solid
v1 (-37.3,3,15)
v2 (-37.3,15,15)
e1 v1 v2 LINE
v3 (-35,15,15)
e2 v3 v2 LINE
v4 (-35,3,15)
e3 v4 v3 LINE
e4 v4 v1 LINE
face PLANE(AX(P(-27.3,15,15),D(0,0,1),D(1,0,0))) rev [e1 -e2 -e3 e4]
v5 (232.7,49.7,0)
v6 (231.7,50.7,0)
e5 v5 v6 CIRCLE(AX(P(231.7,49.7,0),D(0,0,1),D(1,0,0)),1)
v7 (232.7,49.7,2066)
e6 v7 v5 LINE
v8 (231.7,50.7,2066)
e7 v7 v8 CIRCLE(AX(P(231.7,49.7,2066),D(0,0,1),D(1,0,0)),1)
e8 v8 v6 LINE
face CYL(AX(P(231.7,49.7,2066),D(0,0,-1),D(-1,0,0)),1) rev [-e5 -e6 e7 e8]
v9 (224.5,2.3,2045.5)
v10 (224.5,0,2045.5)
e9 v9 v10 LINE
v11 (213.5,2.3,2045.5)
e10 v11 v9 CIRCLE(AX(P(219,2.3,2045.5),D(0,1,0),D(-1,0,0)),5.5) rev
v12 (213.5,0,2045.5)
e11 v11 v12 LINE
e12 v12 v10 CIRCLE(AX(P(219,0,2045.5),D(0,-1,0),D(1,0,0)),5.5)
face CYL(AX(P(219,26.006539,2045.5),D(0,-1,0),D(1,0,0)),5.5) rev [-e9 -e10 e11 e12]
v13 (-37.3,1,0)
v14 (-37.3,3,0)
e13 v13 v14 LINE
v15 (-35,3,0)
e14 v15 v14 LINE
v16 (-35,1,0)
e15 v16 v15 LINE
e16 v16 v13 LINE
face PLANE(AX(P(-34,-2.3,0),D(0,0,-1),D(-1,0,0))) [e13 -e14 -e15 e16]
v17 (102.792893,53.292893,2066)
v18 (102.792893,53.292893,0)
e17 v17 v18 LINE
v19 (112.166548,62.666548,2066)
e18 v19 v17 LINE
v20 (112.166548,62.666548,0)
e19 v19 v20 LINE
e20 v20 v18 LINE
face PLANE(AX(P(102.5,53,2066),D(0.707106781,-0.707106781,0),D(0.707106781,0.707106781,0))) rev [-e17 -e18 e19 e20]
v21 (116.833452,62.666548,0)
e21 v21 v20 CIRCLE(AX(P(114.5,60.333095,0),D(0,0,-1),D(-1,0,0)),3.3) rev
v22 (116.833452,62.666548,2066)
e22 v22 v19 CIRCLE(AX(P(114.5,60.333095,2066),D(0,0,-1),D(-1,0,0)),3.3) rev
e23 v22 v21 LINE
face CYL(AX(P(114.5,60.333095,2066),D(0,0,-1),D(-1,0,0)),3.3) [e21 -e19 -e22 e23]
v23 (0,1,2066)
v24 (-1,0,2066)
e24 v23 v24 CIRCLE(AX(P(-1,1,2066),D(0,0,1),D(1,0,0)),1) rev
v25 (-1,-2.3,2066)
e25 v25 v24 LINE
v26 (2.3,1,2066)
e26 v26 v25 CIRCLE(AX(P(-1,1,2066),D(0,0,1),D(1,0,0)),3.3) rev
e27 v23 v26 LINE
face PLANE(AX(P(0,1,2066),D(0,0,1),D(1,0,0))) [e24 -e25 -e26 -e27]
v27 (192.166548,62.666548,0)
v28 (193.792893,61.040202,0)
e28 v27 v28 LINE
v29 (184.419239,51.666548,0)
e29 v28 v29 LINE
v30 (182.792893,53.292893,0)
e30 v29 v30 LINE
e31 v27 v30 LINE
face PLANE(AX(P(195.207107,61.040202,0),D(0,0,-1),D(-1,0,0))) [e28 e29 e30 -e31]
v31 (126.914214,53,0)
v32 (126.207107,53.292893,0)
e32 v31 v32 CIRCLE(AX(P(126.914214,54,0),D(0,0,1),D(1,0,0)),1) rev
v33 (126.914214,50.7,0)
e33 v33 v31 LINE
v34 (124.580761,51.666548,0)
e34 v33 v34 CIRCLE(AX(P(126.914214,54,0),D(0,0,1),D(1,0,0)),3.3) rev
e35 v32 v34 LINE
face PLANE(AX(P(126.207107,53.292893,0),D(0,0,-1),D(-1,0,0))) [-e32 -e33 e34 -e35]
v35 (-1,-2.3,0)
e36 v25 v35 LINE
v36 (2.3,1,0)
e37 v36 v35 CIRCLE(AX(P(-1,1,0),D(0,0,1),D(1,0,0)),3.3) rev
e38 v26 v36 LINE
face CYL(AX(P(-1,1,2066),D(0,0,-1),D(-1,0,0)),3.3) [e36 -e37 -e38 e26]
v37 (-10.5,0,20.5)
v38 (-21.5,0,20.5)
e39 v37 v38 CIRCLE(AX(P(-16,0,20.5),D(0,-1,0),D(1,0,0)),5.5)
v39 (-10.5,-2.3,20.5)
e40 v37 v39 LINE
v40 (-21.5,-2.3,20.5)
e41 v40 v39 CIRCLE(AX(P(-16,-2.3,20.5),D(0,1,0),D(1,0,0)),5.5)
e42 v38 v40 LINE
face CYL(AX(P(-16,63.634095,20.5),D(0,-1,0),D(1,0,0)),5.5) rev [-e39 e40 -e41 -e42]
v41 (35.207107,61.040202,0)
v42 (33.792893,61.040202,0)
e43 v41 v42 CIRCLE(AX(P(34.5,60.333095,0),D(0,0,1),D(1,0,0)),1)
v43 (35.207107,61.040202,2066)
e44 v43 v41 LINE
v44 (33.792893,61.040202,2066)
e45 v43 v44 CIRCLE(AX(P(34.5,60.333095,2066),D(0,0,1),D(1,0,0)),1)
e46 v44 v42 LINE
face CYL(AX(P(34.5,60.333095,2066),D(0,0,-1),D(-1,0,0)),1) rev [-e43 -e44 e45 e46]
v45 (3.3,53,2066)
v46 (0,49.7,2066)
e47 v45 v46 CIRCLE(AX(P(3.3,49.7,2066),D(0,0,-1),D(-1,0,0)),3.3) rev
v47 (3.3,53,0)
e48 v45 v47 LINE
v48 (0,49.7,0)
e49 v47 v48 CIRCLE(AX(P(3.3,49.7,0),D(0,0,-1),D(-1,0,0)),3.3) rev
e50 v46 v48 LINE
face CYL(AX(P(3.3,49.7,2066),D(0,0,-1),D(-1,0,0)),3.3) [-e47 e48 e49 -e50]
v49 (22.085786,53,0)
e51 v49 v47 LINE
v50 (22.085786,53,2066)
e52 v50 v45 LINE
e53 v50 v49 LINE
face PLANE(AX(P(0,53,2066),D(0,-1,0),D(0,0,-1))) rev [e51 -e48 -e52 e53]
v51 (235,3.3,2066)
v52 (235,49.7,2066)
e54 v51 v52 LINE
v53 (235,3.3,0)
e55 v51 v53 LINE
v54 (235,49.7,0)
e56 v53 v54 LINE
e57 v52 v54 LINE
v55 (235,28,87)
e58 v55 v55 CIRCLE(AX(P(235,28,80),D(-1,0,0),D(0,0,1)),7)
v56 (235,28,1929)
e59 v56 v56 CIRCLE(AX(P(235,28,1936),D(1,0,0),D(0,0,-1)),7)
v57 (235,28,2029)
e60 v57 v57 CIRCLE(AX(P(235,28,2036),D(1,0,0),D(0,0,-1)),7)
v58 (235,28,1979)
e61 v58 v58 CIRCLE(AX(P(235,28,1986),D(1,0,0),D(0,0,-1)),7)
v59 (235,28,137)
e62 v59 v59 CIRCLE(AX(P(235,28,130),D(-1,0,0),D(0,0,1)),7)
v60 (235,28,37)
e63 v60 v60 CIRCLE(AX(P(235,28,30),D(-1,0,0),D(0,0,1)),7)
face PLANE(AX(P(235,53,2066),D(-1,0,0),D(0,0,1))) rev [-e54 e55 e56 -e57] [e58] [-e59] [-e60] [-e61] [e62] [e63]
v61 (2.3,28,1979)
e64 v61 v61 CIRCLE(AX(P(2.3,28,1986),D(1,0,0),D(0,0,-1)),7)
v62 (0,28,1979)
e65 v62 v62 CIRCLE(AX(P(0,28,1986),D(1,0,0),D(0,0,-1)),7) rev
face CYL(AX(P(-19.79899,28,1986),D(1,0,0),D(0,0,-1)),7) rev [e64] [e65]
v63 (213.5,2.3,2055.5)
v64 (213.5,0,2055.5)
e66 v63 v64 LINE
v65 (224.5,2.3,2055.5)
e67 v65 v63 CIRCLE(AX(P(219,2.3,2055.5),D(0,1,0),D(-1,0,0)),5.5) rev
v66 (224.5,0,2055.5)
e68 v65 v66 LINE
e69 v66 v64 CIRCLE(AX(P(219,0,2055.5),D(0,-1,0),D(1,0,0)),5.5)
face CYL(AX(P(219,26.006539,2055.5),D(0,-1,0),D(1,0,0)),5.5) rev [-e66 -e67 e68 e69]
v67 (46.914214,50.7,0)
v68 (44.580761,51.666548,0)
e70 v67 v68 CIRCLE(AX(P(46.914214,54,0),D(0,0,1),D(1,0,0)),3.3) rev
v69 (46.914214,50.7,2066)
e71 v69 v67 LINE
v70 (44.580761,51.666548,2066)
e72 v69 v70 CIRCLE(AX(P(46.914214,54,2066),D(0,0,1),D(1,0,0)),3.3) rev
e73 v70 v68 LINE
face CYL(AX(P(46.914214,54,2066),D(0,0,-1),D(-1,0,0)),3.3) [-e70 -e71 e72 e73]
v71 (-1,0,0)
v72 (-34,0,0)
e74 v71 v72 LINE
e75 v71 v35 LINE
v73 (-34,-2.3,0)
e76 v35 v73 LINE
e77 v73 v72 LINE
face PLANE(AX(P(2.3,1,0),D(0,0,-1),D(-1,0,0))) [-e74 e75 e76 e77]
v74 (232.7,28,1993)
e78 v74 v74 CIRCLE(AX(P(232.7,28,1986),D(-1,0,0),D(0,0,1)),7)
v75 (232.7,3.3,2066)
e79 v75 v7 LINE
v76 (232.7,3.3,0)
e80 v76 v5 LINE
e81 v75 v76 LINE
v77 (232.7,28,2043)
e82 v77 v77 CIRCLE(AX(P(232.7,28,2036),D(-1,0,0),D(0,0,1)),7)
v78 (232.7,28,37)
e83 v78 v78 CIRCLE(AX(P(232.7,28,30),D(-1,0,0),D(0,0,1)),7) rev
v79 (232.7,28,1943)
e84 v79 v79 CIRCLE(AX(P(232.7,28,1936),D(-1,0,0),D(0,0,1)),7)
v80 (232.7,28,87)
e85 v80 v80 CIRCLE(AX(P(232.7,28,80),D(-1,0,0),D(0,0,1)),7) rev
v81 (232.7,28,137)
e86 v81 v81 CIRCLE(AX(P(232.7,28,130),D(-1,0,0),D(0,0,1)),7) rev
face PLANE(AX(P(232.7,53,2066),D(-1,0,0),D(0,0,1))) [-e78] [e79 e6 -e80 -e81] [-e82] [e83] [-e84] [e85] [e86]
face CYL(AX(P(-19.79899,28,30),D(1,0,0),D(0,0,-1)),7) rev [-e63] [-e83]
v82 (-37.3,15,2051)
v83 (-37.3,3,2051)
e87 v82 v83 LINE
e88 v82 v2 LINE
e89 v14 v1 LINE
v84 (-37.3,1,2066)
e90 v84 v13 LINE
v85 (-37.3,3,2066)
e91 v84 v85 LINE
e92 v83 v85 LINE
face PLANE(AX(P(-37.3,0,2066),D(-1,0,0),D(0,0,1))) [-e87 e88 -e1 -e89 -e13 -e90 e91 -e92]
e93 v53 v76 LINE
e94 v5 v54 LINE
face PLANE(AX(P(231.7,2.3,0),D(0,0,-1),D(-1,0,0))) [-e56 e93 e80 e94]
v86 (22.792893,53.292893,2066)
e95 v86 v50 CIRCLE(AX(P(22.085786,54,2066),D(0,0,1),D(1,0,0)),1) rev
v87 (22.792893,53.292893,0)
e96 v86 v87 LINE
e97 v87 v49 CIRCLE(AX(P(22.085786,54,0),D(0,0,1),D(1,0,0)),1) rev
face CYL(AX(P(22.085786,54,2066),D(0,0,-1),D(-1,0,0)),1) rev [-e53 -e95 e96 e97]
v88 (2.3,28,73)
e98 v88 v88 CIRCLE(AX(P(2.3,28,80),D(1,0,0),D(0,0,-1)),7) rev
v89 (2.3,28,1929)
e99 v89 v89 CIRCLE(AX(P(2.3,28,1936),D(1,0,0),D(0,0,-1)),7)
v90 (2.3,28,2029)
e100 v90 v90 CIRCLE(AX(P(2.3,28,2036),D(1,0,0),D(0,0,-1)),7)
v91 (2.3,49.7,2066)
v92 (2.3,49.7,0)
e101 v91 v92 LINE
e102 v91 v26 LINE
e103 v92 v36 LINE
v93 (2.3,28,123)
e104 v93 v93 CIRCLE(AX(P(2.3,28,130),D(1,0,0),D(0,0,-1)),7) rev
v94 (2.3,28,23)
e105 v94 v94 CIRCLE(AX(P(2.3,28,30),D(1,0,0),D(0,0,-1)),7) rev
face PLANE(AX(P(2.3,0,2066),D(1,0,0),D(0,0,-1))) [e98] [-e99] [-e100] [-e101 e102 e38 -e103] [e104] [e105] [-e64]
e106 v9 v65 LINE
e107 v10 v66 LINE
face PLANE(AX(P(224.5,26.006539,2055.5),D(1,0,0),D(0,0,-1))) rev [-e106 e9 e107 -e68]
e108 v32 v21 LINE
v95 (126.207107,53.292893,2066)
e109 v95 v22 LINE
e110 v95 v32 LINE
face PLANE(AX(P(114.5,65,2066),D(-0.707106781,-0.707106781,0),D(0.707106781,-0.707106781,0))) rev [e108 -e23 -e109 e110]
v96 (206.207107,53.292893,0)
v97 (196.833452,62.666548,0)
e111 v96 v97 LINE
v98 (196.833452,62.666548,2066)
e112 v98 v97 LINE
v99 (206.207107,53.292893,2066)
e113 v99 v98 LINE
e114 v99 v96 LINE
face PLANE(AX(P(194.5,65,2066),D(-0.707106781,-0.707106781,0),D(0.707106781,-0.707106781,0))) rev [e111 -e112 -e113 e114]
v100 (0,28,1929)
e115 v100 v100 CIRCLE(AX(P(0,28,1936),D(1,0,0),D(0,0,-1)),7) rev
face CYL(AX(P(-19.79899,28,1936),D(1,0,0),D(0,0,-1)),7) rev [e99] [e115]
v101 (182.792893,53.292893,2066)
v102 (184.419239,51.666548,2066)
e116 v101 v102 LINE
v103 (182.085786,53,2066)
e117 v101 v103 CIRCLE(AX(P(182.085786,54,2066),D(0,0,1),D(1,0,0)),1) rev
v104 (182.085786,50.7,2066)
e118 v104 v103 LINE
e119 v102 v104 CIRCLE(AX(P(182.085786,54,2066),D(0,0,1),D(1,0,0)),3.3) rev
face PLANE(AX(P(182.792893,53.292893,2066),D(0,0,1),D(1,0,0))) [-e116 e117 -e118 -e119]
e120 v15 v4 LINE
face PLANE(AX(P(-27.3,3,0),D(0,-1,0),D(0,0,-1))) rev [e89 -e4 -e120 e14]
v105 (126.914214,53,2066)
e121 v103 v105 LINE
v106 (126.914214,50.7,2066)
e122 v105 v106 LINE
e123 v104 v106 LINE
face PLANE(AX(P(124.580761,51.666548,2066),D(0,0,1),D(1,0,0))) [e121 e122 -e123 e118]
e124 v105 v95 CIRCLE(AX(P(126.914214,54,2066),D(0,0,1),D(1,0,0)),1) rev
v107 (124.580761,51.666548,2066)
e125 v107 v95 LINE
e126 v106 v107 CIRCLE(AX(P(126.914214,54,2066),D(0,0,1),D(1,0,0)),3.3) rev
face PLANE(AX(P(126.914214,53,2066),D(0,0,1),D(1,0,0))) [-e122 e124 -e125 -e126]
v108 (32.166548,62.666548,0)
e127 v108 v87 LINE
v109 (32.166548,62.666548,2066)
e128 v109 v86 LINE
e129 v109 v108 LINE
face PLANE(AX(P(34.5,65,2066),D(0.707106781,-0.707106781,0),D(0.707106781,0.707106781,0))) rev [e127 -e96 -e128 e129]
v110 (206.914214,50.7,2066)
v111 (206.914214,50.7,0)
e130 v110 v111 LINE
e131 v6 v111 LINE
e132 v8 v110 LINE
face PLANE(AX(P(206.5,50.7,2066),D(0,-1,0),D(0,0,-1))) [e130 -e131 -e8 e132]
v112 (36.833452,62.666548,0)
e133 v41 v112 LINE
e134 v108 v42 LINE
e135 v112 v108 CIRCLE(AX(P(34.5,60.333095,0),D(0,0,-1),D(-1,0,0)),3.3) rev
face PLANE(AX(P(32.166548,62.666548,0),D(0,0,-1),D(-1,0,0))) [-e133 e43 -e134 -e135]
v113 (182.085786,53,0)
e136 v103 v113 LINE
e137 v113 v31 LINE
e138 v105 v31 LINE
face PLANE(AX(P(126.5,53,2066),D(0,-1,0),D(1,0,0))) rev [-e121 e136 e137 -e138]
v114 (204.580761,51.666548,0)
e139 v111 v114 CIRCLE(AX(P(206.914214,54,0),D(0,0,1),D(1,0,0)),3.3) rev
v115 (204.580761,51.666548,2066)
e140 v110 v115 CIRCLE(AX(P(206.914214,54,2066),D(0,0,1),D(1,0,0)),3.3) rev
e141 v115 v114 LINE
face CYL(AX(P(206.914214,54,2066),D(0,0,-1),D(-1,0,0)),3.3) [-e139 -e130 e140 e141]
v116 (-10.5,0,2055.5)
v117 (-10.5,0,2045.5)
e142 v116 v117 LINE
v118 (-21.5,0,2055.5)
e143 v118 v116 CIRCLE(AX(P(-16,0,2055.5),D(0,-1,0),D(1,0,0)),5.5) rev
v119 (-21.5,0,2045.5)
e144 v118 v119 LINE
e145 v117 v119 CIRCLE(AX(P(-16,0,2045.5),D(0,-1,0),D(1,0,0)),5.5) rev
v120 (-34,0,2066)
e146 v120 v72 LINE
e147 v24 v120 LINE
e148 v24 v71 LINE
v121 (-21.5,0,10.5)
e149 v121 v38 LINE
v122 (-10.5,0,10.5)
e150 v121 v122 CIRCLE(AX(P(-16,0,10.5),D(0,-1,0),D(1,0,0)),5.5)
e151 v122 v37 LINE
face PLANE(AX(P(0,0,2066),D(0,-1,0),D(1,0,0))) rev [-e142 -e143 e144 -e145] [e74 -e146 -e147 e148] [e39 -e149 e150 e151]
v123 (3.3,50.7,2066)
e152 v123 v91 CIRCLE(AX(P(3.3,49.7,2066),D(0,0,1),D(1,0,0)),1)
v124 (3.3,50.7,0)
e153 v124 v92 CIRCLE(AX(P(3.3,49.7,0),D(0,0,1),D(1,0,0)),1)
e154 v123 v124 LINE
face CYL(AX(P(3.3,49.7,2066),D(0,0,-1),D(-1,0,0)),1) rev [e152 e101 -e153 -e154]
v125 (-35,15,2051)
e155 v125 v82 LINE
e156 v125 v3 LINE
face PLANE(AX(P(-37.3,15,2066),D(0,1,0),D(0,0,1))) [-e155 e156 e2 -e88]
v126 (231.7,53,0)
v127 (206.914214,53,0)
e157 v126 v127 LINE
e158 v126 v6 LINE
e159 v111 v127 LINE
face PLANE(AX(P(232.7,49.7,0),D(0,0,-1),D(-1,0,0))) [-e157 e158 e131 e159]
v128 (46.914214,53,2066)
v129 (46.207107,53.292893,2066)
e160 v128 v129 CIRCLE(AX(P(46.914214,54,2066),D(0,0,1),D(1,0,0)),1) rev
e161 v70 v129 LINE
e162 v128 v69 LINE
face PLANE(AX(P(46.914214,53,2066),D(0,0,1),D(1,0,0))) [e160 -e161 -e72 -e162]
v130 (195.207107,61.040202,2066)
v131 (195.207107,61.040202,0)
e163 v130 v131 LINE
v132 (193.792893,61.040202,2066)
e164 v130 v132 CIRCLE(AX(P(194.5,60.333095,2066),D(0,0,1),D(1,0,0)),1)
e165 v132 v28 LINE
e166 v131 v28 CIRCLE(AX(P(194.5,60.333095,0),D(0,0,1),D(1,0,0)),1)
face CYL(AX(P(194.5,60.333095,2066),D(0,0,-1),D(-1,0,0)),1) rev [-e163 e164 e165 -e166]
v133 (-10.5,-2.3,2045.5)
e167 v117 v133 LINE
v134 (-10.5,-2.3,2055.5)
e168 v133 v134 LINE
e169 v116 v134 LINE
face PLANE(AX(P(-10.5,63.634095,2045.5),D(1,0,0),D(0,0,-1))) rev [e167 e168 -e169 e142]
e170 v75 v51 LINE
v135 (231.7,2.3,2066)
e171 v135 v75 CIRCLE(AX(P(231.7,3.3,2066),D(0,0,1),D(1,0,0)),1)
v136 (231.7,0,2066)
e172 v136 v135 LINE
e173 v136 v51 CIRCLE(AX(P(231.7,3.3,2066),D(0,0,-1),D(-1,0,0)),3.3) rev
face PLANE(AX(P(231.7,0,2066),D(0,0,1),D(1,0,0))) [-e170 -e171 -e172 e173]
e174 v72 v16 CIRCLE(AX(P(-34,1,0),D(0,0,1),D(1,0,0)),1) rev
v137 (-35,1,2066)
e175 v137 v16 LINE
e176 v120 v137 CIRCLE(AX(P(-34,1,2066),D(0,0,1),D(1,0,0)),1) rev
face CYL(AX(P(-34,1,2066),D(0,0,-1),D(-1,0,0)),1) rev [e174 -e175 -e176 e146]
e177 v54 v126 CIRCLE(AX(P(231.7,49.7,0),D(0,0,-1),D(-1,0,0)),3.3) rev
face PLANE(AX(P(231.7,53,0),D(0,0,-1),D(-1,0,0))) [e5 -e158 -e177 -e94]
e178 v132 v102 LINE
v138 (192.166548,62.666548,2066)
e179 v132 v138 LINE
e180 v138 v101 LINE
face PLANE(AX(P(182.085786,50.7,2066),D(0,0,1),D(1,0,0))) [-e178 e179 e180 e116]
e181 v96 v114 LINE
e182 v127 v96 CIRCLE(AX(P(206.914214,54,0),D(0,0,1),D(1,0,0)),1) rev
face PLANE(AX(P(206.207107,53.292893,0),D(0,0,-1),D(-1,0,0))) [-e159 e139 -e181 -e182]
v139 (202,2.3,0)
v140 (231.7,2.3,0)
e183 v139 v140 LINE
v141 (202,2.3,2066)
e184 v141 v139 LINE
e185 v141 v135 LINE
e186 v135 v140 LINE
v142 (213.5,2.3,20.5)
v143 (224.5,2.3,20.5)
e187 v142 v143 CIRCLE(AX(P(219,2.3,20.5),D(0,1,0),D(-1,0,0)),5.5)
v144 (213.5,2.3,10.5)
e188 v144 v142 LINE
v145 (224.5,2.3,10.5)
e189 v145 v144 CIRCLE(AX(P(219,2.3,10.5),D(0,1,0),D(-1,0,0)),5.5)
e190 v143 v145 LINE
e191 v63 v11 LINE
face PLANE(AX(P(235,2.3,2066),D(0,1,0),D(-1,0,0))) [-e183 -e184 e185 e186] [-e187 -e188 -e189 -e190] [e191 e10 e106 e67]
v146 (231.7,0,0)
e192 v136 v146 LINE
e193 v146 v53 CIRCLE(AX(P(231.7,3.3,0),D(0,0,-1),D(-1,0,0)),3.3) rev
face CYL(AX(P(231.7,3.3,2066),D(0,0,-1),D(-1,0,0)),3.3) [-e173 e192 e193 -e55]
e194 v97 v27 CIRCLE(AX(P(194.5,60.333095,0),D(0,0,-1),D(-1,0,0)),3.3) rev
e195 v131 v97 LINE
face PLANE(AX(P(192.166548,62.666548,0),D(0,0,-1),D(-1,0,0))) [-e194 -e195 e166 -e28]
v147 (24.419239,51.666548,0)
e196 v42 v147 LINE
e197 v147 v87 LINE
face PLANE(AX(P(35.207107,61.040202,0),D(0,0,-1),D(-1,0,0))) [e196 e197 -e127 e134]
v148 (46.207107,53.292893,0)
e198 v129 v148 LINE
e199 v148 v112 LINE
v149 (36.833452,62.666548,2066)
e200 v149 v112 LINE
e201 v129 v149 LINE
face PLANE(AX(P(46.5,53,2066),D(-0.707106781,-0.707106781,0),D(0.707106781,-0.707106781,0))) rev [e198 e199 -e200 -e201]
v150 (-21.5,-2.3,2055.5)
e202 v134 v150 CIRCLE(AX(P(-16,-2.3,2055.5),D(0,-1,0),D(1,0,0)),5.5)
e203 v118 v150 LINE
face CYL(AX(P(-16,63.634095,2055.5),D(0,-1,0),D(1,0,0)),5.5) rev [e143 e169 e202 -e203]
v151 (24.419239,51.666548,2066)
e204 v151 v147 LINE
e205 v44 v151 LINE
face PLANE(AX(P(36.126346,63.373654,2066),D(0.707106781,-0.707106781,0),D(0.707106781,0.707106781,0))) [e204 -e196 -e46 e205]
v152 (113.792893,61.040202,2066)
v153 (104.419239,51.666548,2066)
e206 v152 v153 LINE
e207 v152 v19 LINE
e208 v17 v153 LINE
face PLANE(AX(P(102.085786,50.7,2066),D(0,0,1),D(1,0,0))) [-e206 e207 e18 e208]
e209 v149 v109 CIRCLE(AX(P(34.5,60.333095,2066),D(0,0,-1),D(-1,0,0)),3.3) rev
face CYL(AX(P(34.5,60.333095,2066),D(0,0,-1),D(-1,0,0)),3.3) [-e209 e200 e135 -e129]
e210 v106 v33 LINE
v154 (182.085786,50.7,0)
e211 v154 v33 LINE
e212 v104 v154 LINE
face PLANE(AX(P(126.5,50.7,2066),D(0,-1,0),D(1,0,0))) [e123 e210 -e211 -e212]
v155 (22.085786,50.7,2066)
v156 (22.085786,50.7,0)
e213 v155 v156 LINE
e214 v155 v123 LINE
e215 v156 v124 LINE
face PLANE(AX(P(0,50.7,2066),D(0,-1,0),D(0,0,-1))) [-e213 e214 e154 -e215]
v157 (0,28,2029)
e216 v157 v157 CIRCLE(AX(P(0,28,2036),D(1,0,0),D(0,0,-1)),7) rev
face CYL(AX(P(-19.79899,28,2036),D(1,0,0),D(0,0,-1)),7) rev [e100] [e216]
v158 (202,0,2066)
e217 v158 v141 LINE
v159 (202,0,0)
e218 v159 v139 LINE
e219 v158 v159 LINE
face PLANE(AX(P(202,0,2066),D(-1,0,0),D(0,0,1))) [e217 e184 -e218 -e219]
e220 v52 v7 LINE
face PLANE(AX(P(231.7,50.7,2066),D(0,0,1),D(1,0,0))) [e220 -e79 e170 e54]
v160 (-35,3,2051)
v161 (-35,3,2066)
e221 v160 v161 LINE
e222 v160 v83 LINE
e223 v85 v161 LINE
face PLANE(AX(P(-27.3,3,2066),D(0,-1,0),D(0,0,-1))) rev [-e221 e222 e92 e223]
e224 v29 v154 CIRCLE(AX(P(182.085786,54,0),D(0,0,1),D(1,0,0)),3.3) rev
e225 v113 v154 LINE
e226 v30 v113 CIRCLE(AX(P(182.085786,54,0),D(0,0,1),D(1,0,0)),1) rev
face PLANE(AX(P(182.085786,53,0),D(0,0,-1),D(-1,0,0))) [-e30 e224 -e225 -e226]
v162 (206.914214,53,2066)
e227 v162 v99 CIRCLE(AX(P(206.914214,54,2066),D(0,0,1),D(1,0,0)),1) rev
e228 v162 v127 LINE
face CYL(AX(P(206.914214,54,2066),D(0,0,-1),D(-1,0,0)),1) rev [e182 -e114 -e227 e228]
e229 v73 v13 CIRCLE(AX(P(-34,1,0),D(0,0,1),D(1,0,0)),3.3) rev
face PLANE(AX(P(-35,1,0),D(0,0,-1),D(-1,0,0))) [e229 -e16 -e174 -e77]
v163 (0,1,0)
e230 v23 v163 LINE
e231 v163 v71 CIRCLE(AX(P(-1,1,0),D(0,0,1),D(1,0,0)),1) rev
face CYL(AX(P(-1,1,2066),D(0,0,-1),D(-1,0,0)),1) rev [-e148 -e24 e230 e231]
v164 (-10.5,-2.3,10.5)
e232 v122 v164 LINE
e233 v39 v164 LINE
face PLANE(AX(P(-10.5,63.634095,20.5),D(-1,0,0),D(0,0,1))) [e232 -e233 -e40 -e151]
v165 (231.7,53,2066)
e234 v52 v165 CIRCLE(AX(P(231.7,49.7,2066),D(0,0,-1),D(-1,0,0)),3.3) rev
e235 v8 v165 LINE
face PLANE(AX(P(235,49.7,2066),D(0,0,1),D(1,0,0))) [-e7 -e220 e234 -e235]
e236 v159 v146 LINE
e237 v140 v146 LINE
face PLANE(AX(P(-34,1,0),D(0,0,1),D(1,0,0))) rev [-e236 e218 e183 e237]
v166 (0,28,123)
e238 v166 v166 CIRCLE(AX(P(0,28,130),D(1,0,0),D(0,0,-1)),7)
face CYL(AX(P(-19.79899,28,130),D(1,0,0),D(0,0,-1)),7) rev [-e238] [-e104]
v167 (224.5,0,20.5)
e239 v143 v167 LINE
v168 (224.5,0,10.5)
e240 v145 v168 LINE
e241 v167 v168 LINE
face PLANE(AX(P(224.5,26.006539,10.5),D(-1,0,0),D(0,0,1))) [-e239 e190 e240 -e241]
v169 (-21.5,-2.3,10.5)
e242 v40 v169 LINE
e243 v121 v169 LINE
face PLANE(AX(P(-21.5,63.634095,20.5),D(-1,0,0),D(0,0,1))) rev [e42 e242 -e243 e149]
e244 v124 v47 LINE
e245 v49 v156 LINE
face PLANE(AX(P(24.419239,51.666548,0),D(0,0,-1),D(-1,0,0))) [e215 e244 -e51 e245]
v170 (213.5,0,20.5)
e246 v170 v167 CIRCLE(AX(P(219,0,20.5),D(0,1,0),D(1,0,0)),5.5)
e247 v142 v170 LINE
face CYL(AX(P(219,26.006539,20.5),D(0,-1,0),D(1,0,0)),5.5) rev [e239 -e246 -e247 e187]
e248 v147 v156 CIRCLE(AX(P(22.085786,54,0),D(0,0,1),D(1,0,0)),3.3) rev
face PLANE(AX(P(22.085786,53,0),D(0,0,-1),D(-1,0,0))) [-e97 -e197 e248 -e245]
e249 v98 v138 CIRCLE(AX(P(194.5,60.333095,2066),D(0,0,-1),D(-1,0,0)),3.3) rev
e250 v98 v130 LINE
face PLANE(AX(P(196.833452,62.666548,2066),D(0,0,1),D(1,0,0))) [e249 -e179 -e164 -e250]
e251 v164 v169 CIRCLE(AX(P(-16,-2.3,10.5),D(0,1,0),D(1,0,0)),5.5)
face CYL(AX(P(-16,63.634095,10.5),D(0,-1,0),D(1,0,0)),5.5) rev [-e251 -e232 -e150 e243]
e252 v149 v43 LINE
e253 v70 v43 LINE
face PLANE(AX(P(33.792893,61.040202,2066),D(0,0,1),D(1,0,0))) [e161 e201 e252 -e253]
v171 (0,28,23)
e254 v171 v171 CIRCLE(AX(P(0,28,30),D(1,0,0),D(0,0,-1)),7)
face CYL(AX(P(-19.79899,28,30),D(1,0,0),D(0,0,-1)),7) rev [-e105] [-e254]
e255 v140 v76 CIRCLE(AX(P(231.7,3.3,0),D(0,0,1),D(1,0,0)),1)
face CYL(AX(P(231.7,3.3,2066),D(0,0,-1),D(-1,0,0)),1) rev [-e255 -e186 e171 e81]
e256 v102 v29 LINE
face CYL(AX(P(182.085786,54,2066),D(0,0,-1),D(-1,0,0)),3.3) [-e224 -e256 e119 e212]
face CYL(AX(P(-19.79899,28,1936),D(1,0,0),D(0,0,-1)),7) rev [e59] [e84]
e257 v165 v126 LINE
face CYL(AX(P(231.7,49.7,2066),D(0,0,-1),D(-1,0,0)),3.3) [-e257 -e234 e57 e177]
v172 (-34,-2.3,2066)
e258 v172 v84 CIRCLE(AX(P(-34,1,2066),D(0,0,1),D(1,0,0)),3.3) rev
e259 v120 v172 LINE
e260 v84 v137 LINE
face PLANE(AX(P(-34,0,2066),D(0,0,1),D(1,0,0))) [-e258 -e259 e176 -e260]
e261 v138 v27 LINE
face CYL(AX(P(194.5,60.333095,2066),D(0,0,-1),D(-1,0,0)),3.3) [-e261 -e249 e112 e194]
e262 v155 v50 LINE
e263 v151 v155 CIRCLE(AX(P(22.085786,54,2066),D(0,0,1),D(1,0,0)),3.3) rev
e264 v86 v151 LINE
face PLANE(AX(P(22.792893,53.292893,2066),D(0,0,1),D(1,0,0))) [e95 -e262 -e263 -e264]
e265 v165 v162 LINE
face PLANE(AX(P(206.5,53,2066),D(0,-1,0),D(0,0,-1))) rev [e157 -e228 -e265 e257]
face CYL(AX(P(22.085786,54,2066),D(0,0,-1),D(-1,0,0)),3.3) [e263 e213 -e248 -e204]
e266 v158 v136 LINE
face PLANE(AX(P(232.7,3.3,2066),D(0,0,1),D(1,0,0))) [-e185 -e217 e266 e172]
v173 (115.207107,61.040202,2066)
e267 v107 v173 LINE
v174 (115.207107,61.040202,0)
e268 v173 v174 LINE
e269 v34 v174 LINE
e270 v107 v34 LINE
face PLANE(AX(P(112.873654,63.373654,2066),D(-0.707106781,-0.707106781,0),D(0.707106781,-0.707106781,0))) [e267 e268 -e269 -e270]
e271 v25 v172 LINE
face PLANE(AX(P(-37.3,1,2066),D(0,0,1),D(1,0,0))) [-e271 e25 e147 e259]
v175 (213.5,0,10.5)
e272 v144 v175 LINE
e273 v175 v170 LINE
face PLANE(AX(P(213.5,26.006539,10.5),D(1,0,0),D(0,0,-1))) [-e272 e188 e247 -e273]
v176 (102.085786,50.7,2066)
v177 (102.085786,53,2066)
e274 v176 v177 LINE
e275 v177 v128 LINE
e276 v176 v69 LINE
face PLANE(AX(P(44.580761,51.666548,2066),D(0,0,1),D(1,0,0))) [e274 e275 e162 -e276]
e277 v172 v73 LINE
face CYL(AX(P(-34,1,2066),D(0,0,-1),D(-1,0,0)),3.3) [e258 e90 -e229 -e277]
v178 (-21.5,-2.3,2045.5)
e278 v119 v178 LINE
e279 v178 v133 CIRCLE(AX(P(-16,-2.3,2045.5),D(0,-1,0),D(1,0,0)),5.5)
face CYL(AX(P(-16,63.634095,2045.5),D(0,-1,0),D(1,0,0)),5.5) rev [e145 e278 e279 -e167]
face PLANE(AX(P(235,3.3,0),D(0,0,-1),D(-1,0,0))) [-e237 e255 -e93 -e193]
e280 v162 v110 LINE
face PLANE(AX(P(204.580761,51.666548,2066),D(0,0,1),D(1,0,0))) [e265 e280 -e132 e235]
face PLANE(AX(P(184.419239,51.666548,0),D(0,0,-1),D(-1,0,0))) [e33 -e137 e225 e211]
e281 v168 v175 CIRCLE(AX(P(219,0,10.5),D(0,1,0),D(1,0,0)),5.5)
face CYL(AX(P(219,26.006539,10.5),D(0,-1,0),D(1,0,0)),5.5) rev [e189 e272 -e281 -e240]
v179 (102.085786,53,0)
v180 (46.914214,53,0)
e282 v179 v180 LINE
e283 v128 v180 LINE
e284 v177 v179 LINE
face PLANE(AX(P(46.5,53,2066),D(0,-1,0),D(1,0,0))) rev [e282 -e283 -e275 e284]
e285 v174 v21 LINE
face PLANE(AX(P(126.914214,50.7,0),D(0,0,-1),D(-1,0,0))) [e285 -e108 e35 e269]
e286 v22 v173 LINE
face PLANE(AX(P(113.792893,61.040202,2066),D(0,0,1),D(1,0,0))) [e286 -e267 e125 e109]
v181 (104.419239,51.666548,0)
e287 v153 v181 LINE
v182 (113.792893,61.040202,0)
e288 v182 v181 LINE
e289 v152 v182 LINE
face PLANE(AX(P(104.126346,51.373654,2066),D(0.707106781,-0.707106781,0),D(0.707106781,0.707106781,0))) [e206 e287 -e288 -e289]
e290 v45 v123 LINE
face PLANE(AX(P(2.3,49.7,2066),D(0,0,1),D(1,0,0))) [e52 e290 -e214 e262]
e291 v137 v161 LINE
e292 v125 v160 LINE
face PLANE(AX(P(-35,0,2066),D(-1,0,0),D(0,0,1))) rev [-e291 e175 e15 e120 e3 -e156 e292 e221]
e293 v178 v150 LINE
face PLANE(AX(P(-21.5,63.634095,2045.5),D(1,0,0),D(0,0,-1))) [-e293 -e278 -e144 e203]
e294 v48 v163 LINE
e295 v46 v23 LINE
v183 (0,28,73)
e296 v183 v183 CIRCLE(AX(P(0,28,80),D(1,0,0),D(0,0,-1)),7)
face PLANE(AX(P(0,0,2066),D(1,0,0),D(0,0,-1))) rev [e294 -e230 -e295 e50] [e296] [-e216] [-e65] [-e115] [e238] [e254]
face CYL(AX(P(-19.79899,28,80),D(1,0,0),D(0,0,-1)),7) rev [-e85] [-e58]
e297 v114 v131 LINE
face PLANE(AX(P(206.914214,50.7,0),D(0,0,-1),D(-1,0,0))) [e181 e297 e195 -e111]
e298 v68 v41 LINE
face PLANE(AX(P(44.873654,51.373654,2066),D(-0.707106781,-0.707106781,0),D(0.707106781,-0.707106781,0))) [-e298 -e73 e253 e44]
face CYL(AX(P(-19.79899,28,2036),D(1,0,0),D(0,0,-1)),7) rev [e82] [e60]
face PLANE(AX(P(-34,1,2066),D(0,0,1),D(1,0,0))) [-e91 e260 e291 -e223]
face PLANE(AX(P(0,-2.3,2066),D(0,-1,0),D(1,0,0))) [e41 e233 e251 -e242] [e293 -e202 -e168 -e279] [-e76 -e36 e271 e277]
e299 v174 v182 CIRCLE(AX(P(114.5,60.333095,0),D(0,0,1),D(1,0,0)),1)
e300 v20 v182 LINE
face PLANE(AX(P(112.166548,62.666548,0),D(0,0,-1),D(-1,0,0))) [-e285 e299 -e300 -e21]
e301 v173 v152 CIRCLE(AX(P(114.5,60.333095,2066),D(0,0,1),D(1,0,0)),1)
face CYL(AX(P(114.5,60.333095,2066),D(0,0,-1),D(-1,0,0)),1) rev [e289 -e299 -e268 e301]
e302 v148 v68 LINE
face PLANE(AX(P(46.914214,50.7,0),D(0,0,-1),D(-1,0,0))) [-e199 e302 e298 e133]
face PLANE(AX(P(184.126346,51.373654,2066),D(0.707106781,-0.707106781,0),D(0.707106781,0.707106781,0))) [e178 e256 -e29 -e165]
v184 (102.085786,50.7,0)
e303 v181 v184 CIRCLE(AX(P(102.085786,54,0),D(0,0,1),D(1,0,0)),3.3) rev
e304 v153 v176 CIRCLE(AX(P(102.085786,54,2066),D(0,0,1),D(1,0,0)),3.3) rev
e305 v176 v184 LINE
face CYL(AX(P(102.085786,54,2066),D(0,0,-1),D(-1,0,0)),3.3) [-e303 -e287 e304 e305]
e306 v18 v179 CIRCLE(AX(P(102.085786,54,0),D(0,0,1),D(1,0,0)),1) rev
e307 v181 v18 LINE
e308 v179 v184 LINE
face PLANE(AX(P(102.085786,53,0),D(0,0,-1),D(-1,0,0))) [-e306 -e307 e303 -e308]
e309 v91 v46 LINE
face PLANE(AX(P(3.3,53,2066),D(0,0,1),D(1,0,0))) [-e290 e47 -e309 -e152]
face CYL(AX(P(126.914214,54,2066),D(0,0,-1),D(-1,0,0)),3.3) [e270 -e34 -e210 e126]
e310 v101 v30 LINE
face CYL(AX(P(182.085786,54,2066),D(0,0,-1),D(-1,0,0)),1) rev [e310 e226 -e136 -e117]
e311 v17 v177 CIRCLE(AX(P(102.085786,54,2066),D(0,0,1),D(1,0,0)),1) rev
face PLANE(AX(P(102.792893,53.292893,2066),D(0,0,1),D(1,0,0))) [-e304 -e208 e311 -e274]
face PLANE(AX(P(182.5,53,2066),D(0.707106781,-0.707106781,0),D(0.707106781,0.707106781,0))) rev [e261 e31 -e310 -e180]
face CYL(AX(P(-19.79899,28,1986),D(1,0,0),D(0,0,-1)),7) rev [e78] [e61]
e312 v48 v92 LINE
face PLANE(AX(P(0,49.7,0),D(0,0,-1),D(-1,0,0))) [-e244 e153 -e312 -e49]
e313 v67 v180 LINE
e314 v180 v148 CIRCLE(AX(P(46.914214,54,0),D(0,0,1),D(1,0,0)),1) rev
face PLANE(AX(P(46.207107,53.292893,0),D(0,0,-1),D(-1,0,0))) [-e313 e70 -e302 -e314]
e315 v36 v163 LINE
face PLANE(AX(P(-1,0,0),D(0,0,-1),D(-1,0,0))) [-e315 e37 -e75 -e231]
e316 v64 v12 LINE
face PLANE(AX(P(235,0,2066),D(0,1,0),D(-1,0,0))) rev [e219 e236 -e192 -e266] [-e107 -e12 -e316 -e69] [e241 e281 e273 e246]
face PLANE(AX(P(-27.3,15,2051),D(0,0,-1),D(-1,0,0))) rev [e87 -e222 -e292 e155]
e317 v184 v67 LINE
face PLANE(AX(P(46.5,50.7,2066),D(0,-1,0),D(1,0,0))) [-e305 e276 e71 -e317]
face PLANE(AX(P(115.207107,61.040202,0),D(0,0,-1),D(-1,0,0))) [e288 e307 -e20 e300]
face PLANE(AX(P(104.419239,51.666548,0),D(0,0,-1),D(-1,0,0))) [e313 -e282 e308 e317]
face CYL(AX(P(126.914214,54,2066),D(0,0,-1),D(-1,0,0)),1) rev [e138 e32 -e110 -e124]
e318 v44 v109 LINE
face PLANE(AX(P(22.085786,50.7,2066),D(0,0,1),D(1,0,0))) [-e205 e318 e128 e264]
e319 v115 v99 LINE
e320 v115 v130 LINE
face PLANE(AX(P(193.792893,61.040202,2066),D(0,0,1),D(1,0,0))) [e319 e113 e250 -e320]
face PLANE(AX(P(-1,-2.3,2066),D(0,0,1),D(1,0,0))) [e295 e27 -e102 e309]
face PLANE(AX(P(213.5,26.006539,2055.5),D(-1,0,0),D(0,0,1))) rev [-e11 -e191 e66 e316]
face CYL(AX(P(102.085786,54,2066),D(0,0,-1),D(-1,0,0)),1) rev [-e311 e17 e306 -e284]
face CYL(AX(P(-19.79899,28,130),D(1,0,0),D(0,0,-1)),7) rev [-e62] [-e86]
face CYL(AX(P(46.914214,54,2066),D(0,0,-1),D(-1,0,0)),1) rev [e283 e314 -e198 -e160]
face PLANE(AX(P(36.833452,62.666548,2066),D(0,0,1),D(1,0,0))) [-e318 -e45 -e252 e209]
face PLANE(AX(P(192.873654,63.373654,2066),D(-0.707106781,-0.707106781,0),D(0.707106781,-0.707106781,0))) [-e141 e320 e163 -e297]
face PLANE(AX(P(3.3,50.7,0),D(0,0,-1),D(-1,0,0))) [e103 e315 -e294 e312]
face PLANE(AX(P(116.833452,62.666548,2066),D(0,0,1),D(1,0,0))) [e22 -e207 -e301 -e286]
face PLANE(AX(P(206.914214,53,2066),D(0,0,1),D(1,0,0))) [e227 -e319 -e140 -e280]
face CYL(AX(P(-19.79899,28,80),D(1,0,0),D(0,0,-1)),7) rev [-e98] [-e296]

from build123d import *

# Parameters (mm, degrees)
SM_BASE_FLANGE_1_DEPTH = 2066
CUT_EXTRUDE_2_DEPTH    = 2.3
CUT_EXTRUDE_3_REACH    = 2082.367
CUT_EXTRUDE_4_REACH    = 2086.839
SKETCH_8_R             = 7
SKETCH_9_W             = 15
SKETCH_9_H             = 12
CUT_EXTRUDE_5_DEPTH    = 10


# Sheet-metal steps are written as plain solids
with BuildPart() as part:
    # Sketch 1 → 基体-法兰1 (new body)
    with BuildSketch(Plane.XY):
        with BuildLine():
            Line((-35, 15), (-35, 1))
            ThreePointArc((-35, 1), (-34.707106781, 0.292893219), (-34, 0))
            Line((-34, 0), (-1, 0))
            ThreePointArc((-1, 0), (-0.292893219, 0.292893219), (0, 1))
            Line((0, 1), (0, 49.7))
            ThreePointArc((0, 49.7), (0.966547622, 52.033452378), (3.3, 53))
            Line((3.3, 53), (22.085786438, 53))
            ThreePointArc((22.085786438, 53), (22.46846987, 53.076120467), (22.792893219, 53.292893219))
            Line((22.792893219, 53.292893219), (32.166547622, 62.666547622))
            ThreePointArc((32.166547622, 62.666547622), (34.5, 63.633095244), (36.833452378, 62.666547622))
            Line((36.833452378, 62.666547622), (46.207106781, 53.292893219))
            ThreePointArc((46.207106781, 53.292893219), (46.53153013, 53.076120467), (46.914213562, 53))
            Line((46.914213562, 53), (102.085786438, 53))
            ThreePointArc((102.085786438, 53), (102.46846987, 53.076120467), (102.792893219, 53.292893219))
            Line((102.792893219, 53.292893219), (112.166547622, 62.666547622))
            ThreePointArc((112.166547622, 62.666547622), (114.5, 63.633095244), (116.833452378, 62.666547622))
            Line((116.833452378, 62.666547622), (126.207106781, 53.292893219))
            ThreePointArc((126.207106781, 53.292893219), (126.53153013, 53.076120467), (126.914213562, 53))
            Line((126.914213562, 53), (182.085786438, 53))
            ThreePointArc((182.085786438, 53), (182.46846987, 53.076120467), (182.792893219, 53.292893219))
            Line((182.792893219, 53.292893219), (192.166547622, 62.666547622))
            ThreePointArc((192.166547622, 62.666547622), (194.5, 63.633095244), (196.833452378, 62.666547622))
            Line((196.833452378, 62.666547622), (206.207106781, 53.292893219))
            ThreePointArc((206.207106781, 53.292893219), (206.53153013, 53.076120467), (206.914213562, 53))
            Line((206.914213562, 53), (231.7, 53))
            ThreePointArc((231.7, 53), (234.033452378, 52.033452378), (235, 49.7))
            Line((235, 49.7), (235, 3.3))
            ThreePointArc((235, 3.3), (234.033452378, 0.966547622), (231.7, 0))
            Line((231.7, 0), (202, 0))
            Line((202, 0), (202, 2.3))
            Line((202, 2.3), (231.7, 2.3))
            ThreePointArc((231.7, 2.3), (232.407106781, 2.592893219), (232.7, 3.3))
            Line((232.7, 3.3), (232.7, 49.7))
            ThreePointArc((232.7, 49.7), (232.407106781, 50.407106781), (231.7, 50.7))
            Line((231.7, 50.7), (206.914213562, 50.7))
            ThreePointArc((206.914213562, 50.7), (205.651358236, 50.951197543), (204.580761184, 51.666547622))
            Line((204.580761184, 51.666547622), (195.207106781, 61.040202025))
            ThreePointArc((195.207106781, 61.040202025), (194.5, 61.333095244), (193.792893219, 61.040202025))
            Line((193.792893219, 61.040202025), (184.419238816, 51.666547622))
            ThreePointArc((184.419238816, 51.666547622), (183.348641764, 50.951197543), (182.085786438, 50.7))
            Line((182.085786438, 50.7), (126.914213562, 50.7))
            ThreePointArc((126.914213562, 50.7), (125.651358236, 50.951197543), (124.580761184, 51.666547622))
            Line((124.580761184, 51.666547622), (115.207106781, 61.040202025))
            ThreePointArc((115.207106781, 61.040202025), (114.5, 61.333095244), (113.792893219, 61.040202025))
            Line((113.792893219, 61.040202025), (104.419238816, 51.666547622))
            ThreePointArc((104.419238816, 51.666547622), (103.348641764, 50.951197543), (102.085786438, 50.7))
            Line((102.085786438, 50.7), (46.914213562, 50.7))
            ThreePointArc((46.914213562, 50.7), (45.651358236, 50.951197543), (44.580761184, 51.666547622))
            Line((44.580761184, 51.666547622), (35.207106781, 61.040202025))
            ThreePointArc((35.207106781, 61.040202025), (34.5, 61.333095244), (33.792893219, 61.040202025))
            Line((33.792893219, 61.040202025), (24.419238816, 51.666547622))
            ThreePointArc((24.419238816, 51.666547622), (23.348641764, 50.951197543), (22.085786438, 50.7))
            Line((22.085786438, 50.7), (3.3, 50.7))
            ThreePointArc((3.3, 50.7), (2.592893219, 50.407106781), (2.3, 49.7))
            Line((2.3, 49.7), (2.3, 1))
            ThreePointArc((2.3, 1), (1.333452378, -1.333452378), (-1, -2.3))
            Line((-1, -2.3), (-34, -2.3))
            ThreePointArc((-34, -2.3), (-36.333452378, -1.333452378), (-37.3, 1))
            Line((-37.3, 1), (-37.3, 15))
            Line((-37.3, 15), (-35, 15))
        make_face()
    extrude(amount=SM_BASE_FLANGE_1_DEPTH)

    # 草图6 → 切除-拉伸2 (cut)
    with BuildSketch(Plane.XZ):
        with BuildLine():
            Line((213.5, 2055.5), (213.5, 2045.5))
            ThreePointArc((213.5, 2045.5), (219, 2040), (224.5, 2045.5))
            Line((224.5, 2045.5), (224.5, 2055.5))
            ThreePointArc((224.5, 2055.5), (219, 2061), (213.5, 2055.5))
        make_face()
    cut_extrude_2 = extrude(amount=-CUT_EXTRUDE_2_DEPTH, mode=Mode.SUBTRACT)

    # 草图7 → 切除-拉伸3 (cut, up to next)
    with BuildSketch(Plane.XZ.offset(2.3), mode=Mode.PRIVATE) as cut_extrude_3_sk1:
        with BuildLine():
            Line((-10.5, 2045.5), (-10.5, 2055.5))
            ThreePointArc((-10.5, 2055.5), (-16, 2061), (-21.5, 2055.5))
            Line((-21.5, 2055.5), (-21.5, 2045.5))
            ThreePointArc((-21.5, 2045.5), (-16, 2040), (-10.5, 2045.5))
        make_face()
    cut_extrude_3_tool1 = extrude(cut_extrude_3_sk1.sketch, amount=-CUT_EXTRUDE_3_REACH, mode=Mode.PRIVATE) & part.part
    cut_extrude_3 = cut_extrude_3_tool1.solids().sort_by_distance((-16, -2.3, 2050.5))[0]
    add(cut_extrude_3, mode=Mode.SUBTRACT)

    # 镜向1: 切除-拉伸2, 切除-拉伸3 across plane
    add(cut_extrude_2.mirror(Plane.XY.offset(1033)), mode=Mode.SUBTRACT)
    add(cut_extrude_3.mirror(Plane.XY.offset(1033)), mode=Mode.SUBTRACT)

    # 切除-拉伸4: up to this face of the body (flat: up to its plane)
    cut_extrude_4_end = Plane(part.part.faces().sort_by_distance((0, 25.35, 1033))[0])
    # 草图8 → 切除-拉伸4 (cut, up to the picked face)
    with BuildSketch(Plane(origin=(235, 0, 0), x_dir=(0, 0, -1), z_dir=(1, 0, 0)), mode=Mode.PRIVATE) as cut_extrude_4_sk1:
        with Locations((-2036, 28)):
            Circle(SKETCH_8_R)
    cut_extrude_4_tool1 = split(extrude(cut_extrude_4_sk1.sketch, amount=-CUT_EXTRUDE_4_REACH, mode=Mode.PRIVATE), bisect_by=cut_extrude_4_end, keep=Keep.BOTH, mode=Mode.PRIVATE)
    # 草图8 → 切除-拉伸4 (cut, up to the picked face)
    with BuildSketch(Plane(origin=(235, 0, 0), x_dir=(0, 0, -1), z_dir=(1, 0, 0)), mode=Mode.PRIVATE) as cut_extrude_4_sk2:
        with Locations((-1986, 28)):
            Circle(SKETCH_8_R)
    cut_extrude_4_tool2 = split(extrude(cut_extrude_4_sk2.sketch, amount=-CUT_EXTRUDE_4_REACH, mode=Mode.PRIVATE), bisect_by=cut_extrude_4_end, keep=Keep.BOTH, mode=Mode.PRIVATE)
    # 草图8 → 切除-拉伸4 (cut, up to the picked face)
    with BuildSketch(Plane(origin=(235, 0, 0), x_dir=(0, 0, -1), z_dir=(1, 0, 0)), mode=Mode.PRIVATE) as cut_extrude_4_sk3:
        with Locations((-1936, 28)):
            Circle(SKETCH_8_R)
    cut_extrude_4_tool3 = split(extrude(cut_extrude_4_sk3.sketch, amount=-CUT_EXTRUDE_4_REACH, mode=Mode.PRIVATE), bisect_by=cut_extrude_4_end, keep=Keep.BOTH, mode=Mode.PRIVATE)
    cut_extrude_4_1 = cut_extrude_4_tool1.solids().sort_by(Axis((235, 28, 2036), (-1, 0, 0)))[0]
    add(cut_extrude_4_1, mode=Mode.SUBTRACT)
    cut_extrude_4_2 = cut_extrude_4_tool2.solids().sort_by(Axis((235, 28, 1986), (-1, 0, 0)))[0]
    add(cut_extrude_4_2, mode=Mode.SUBTRACT)
    cut_extrude_4_3 = cut_extrude_4_tool3.solids().sort_by(Axis((235, 28, 1936), (-1, 0, 0)))[0]
    add(cut_extrude_4_3, mode=Mode.SUBTRACT)
    cut_extrude_4 = cut_extrude_4_1 + cut_extrude_4_2 + cut_extrude_4_3  # 切除-拉伸4 as one shape, for the pattern or mirror that repeats it

    # 镜向2: 切除-拉伸4 across plane
    add(cut_extrude_4.mirror(Plane.XY.offset(1033)), mode=Mode.SUBTRACT)

    # 草图9 → 切除-拉伸5 (cut)
    with BuildSketch(Plane.ZY.offset(37.3)):
        with Locations((7.5, 9)):
            Rectangle(SKETCH_9_W, SKETCH_9_H)
        with Locations((2058.5, 9)):
            Rectangle(SKETCH_9_W, SKETCH_9_H)
    extrude(amount=-CUT_EXTRUDE_5_DEPTH, mode=Mode.SUBTRACT)


solid = part.part
